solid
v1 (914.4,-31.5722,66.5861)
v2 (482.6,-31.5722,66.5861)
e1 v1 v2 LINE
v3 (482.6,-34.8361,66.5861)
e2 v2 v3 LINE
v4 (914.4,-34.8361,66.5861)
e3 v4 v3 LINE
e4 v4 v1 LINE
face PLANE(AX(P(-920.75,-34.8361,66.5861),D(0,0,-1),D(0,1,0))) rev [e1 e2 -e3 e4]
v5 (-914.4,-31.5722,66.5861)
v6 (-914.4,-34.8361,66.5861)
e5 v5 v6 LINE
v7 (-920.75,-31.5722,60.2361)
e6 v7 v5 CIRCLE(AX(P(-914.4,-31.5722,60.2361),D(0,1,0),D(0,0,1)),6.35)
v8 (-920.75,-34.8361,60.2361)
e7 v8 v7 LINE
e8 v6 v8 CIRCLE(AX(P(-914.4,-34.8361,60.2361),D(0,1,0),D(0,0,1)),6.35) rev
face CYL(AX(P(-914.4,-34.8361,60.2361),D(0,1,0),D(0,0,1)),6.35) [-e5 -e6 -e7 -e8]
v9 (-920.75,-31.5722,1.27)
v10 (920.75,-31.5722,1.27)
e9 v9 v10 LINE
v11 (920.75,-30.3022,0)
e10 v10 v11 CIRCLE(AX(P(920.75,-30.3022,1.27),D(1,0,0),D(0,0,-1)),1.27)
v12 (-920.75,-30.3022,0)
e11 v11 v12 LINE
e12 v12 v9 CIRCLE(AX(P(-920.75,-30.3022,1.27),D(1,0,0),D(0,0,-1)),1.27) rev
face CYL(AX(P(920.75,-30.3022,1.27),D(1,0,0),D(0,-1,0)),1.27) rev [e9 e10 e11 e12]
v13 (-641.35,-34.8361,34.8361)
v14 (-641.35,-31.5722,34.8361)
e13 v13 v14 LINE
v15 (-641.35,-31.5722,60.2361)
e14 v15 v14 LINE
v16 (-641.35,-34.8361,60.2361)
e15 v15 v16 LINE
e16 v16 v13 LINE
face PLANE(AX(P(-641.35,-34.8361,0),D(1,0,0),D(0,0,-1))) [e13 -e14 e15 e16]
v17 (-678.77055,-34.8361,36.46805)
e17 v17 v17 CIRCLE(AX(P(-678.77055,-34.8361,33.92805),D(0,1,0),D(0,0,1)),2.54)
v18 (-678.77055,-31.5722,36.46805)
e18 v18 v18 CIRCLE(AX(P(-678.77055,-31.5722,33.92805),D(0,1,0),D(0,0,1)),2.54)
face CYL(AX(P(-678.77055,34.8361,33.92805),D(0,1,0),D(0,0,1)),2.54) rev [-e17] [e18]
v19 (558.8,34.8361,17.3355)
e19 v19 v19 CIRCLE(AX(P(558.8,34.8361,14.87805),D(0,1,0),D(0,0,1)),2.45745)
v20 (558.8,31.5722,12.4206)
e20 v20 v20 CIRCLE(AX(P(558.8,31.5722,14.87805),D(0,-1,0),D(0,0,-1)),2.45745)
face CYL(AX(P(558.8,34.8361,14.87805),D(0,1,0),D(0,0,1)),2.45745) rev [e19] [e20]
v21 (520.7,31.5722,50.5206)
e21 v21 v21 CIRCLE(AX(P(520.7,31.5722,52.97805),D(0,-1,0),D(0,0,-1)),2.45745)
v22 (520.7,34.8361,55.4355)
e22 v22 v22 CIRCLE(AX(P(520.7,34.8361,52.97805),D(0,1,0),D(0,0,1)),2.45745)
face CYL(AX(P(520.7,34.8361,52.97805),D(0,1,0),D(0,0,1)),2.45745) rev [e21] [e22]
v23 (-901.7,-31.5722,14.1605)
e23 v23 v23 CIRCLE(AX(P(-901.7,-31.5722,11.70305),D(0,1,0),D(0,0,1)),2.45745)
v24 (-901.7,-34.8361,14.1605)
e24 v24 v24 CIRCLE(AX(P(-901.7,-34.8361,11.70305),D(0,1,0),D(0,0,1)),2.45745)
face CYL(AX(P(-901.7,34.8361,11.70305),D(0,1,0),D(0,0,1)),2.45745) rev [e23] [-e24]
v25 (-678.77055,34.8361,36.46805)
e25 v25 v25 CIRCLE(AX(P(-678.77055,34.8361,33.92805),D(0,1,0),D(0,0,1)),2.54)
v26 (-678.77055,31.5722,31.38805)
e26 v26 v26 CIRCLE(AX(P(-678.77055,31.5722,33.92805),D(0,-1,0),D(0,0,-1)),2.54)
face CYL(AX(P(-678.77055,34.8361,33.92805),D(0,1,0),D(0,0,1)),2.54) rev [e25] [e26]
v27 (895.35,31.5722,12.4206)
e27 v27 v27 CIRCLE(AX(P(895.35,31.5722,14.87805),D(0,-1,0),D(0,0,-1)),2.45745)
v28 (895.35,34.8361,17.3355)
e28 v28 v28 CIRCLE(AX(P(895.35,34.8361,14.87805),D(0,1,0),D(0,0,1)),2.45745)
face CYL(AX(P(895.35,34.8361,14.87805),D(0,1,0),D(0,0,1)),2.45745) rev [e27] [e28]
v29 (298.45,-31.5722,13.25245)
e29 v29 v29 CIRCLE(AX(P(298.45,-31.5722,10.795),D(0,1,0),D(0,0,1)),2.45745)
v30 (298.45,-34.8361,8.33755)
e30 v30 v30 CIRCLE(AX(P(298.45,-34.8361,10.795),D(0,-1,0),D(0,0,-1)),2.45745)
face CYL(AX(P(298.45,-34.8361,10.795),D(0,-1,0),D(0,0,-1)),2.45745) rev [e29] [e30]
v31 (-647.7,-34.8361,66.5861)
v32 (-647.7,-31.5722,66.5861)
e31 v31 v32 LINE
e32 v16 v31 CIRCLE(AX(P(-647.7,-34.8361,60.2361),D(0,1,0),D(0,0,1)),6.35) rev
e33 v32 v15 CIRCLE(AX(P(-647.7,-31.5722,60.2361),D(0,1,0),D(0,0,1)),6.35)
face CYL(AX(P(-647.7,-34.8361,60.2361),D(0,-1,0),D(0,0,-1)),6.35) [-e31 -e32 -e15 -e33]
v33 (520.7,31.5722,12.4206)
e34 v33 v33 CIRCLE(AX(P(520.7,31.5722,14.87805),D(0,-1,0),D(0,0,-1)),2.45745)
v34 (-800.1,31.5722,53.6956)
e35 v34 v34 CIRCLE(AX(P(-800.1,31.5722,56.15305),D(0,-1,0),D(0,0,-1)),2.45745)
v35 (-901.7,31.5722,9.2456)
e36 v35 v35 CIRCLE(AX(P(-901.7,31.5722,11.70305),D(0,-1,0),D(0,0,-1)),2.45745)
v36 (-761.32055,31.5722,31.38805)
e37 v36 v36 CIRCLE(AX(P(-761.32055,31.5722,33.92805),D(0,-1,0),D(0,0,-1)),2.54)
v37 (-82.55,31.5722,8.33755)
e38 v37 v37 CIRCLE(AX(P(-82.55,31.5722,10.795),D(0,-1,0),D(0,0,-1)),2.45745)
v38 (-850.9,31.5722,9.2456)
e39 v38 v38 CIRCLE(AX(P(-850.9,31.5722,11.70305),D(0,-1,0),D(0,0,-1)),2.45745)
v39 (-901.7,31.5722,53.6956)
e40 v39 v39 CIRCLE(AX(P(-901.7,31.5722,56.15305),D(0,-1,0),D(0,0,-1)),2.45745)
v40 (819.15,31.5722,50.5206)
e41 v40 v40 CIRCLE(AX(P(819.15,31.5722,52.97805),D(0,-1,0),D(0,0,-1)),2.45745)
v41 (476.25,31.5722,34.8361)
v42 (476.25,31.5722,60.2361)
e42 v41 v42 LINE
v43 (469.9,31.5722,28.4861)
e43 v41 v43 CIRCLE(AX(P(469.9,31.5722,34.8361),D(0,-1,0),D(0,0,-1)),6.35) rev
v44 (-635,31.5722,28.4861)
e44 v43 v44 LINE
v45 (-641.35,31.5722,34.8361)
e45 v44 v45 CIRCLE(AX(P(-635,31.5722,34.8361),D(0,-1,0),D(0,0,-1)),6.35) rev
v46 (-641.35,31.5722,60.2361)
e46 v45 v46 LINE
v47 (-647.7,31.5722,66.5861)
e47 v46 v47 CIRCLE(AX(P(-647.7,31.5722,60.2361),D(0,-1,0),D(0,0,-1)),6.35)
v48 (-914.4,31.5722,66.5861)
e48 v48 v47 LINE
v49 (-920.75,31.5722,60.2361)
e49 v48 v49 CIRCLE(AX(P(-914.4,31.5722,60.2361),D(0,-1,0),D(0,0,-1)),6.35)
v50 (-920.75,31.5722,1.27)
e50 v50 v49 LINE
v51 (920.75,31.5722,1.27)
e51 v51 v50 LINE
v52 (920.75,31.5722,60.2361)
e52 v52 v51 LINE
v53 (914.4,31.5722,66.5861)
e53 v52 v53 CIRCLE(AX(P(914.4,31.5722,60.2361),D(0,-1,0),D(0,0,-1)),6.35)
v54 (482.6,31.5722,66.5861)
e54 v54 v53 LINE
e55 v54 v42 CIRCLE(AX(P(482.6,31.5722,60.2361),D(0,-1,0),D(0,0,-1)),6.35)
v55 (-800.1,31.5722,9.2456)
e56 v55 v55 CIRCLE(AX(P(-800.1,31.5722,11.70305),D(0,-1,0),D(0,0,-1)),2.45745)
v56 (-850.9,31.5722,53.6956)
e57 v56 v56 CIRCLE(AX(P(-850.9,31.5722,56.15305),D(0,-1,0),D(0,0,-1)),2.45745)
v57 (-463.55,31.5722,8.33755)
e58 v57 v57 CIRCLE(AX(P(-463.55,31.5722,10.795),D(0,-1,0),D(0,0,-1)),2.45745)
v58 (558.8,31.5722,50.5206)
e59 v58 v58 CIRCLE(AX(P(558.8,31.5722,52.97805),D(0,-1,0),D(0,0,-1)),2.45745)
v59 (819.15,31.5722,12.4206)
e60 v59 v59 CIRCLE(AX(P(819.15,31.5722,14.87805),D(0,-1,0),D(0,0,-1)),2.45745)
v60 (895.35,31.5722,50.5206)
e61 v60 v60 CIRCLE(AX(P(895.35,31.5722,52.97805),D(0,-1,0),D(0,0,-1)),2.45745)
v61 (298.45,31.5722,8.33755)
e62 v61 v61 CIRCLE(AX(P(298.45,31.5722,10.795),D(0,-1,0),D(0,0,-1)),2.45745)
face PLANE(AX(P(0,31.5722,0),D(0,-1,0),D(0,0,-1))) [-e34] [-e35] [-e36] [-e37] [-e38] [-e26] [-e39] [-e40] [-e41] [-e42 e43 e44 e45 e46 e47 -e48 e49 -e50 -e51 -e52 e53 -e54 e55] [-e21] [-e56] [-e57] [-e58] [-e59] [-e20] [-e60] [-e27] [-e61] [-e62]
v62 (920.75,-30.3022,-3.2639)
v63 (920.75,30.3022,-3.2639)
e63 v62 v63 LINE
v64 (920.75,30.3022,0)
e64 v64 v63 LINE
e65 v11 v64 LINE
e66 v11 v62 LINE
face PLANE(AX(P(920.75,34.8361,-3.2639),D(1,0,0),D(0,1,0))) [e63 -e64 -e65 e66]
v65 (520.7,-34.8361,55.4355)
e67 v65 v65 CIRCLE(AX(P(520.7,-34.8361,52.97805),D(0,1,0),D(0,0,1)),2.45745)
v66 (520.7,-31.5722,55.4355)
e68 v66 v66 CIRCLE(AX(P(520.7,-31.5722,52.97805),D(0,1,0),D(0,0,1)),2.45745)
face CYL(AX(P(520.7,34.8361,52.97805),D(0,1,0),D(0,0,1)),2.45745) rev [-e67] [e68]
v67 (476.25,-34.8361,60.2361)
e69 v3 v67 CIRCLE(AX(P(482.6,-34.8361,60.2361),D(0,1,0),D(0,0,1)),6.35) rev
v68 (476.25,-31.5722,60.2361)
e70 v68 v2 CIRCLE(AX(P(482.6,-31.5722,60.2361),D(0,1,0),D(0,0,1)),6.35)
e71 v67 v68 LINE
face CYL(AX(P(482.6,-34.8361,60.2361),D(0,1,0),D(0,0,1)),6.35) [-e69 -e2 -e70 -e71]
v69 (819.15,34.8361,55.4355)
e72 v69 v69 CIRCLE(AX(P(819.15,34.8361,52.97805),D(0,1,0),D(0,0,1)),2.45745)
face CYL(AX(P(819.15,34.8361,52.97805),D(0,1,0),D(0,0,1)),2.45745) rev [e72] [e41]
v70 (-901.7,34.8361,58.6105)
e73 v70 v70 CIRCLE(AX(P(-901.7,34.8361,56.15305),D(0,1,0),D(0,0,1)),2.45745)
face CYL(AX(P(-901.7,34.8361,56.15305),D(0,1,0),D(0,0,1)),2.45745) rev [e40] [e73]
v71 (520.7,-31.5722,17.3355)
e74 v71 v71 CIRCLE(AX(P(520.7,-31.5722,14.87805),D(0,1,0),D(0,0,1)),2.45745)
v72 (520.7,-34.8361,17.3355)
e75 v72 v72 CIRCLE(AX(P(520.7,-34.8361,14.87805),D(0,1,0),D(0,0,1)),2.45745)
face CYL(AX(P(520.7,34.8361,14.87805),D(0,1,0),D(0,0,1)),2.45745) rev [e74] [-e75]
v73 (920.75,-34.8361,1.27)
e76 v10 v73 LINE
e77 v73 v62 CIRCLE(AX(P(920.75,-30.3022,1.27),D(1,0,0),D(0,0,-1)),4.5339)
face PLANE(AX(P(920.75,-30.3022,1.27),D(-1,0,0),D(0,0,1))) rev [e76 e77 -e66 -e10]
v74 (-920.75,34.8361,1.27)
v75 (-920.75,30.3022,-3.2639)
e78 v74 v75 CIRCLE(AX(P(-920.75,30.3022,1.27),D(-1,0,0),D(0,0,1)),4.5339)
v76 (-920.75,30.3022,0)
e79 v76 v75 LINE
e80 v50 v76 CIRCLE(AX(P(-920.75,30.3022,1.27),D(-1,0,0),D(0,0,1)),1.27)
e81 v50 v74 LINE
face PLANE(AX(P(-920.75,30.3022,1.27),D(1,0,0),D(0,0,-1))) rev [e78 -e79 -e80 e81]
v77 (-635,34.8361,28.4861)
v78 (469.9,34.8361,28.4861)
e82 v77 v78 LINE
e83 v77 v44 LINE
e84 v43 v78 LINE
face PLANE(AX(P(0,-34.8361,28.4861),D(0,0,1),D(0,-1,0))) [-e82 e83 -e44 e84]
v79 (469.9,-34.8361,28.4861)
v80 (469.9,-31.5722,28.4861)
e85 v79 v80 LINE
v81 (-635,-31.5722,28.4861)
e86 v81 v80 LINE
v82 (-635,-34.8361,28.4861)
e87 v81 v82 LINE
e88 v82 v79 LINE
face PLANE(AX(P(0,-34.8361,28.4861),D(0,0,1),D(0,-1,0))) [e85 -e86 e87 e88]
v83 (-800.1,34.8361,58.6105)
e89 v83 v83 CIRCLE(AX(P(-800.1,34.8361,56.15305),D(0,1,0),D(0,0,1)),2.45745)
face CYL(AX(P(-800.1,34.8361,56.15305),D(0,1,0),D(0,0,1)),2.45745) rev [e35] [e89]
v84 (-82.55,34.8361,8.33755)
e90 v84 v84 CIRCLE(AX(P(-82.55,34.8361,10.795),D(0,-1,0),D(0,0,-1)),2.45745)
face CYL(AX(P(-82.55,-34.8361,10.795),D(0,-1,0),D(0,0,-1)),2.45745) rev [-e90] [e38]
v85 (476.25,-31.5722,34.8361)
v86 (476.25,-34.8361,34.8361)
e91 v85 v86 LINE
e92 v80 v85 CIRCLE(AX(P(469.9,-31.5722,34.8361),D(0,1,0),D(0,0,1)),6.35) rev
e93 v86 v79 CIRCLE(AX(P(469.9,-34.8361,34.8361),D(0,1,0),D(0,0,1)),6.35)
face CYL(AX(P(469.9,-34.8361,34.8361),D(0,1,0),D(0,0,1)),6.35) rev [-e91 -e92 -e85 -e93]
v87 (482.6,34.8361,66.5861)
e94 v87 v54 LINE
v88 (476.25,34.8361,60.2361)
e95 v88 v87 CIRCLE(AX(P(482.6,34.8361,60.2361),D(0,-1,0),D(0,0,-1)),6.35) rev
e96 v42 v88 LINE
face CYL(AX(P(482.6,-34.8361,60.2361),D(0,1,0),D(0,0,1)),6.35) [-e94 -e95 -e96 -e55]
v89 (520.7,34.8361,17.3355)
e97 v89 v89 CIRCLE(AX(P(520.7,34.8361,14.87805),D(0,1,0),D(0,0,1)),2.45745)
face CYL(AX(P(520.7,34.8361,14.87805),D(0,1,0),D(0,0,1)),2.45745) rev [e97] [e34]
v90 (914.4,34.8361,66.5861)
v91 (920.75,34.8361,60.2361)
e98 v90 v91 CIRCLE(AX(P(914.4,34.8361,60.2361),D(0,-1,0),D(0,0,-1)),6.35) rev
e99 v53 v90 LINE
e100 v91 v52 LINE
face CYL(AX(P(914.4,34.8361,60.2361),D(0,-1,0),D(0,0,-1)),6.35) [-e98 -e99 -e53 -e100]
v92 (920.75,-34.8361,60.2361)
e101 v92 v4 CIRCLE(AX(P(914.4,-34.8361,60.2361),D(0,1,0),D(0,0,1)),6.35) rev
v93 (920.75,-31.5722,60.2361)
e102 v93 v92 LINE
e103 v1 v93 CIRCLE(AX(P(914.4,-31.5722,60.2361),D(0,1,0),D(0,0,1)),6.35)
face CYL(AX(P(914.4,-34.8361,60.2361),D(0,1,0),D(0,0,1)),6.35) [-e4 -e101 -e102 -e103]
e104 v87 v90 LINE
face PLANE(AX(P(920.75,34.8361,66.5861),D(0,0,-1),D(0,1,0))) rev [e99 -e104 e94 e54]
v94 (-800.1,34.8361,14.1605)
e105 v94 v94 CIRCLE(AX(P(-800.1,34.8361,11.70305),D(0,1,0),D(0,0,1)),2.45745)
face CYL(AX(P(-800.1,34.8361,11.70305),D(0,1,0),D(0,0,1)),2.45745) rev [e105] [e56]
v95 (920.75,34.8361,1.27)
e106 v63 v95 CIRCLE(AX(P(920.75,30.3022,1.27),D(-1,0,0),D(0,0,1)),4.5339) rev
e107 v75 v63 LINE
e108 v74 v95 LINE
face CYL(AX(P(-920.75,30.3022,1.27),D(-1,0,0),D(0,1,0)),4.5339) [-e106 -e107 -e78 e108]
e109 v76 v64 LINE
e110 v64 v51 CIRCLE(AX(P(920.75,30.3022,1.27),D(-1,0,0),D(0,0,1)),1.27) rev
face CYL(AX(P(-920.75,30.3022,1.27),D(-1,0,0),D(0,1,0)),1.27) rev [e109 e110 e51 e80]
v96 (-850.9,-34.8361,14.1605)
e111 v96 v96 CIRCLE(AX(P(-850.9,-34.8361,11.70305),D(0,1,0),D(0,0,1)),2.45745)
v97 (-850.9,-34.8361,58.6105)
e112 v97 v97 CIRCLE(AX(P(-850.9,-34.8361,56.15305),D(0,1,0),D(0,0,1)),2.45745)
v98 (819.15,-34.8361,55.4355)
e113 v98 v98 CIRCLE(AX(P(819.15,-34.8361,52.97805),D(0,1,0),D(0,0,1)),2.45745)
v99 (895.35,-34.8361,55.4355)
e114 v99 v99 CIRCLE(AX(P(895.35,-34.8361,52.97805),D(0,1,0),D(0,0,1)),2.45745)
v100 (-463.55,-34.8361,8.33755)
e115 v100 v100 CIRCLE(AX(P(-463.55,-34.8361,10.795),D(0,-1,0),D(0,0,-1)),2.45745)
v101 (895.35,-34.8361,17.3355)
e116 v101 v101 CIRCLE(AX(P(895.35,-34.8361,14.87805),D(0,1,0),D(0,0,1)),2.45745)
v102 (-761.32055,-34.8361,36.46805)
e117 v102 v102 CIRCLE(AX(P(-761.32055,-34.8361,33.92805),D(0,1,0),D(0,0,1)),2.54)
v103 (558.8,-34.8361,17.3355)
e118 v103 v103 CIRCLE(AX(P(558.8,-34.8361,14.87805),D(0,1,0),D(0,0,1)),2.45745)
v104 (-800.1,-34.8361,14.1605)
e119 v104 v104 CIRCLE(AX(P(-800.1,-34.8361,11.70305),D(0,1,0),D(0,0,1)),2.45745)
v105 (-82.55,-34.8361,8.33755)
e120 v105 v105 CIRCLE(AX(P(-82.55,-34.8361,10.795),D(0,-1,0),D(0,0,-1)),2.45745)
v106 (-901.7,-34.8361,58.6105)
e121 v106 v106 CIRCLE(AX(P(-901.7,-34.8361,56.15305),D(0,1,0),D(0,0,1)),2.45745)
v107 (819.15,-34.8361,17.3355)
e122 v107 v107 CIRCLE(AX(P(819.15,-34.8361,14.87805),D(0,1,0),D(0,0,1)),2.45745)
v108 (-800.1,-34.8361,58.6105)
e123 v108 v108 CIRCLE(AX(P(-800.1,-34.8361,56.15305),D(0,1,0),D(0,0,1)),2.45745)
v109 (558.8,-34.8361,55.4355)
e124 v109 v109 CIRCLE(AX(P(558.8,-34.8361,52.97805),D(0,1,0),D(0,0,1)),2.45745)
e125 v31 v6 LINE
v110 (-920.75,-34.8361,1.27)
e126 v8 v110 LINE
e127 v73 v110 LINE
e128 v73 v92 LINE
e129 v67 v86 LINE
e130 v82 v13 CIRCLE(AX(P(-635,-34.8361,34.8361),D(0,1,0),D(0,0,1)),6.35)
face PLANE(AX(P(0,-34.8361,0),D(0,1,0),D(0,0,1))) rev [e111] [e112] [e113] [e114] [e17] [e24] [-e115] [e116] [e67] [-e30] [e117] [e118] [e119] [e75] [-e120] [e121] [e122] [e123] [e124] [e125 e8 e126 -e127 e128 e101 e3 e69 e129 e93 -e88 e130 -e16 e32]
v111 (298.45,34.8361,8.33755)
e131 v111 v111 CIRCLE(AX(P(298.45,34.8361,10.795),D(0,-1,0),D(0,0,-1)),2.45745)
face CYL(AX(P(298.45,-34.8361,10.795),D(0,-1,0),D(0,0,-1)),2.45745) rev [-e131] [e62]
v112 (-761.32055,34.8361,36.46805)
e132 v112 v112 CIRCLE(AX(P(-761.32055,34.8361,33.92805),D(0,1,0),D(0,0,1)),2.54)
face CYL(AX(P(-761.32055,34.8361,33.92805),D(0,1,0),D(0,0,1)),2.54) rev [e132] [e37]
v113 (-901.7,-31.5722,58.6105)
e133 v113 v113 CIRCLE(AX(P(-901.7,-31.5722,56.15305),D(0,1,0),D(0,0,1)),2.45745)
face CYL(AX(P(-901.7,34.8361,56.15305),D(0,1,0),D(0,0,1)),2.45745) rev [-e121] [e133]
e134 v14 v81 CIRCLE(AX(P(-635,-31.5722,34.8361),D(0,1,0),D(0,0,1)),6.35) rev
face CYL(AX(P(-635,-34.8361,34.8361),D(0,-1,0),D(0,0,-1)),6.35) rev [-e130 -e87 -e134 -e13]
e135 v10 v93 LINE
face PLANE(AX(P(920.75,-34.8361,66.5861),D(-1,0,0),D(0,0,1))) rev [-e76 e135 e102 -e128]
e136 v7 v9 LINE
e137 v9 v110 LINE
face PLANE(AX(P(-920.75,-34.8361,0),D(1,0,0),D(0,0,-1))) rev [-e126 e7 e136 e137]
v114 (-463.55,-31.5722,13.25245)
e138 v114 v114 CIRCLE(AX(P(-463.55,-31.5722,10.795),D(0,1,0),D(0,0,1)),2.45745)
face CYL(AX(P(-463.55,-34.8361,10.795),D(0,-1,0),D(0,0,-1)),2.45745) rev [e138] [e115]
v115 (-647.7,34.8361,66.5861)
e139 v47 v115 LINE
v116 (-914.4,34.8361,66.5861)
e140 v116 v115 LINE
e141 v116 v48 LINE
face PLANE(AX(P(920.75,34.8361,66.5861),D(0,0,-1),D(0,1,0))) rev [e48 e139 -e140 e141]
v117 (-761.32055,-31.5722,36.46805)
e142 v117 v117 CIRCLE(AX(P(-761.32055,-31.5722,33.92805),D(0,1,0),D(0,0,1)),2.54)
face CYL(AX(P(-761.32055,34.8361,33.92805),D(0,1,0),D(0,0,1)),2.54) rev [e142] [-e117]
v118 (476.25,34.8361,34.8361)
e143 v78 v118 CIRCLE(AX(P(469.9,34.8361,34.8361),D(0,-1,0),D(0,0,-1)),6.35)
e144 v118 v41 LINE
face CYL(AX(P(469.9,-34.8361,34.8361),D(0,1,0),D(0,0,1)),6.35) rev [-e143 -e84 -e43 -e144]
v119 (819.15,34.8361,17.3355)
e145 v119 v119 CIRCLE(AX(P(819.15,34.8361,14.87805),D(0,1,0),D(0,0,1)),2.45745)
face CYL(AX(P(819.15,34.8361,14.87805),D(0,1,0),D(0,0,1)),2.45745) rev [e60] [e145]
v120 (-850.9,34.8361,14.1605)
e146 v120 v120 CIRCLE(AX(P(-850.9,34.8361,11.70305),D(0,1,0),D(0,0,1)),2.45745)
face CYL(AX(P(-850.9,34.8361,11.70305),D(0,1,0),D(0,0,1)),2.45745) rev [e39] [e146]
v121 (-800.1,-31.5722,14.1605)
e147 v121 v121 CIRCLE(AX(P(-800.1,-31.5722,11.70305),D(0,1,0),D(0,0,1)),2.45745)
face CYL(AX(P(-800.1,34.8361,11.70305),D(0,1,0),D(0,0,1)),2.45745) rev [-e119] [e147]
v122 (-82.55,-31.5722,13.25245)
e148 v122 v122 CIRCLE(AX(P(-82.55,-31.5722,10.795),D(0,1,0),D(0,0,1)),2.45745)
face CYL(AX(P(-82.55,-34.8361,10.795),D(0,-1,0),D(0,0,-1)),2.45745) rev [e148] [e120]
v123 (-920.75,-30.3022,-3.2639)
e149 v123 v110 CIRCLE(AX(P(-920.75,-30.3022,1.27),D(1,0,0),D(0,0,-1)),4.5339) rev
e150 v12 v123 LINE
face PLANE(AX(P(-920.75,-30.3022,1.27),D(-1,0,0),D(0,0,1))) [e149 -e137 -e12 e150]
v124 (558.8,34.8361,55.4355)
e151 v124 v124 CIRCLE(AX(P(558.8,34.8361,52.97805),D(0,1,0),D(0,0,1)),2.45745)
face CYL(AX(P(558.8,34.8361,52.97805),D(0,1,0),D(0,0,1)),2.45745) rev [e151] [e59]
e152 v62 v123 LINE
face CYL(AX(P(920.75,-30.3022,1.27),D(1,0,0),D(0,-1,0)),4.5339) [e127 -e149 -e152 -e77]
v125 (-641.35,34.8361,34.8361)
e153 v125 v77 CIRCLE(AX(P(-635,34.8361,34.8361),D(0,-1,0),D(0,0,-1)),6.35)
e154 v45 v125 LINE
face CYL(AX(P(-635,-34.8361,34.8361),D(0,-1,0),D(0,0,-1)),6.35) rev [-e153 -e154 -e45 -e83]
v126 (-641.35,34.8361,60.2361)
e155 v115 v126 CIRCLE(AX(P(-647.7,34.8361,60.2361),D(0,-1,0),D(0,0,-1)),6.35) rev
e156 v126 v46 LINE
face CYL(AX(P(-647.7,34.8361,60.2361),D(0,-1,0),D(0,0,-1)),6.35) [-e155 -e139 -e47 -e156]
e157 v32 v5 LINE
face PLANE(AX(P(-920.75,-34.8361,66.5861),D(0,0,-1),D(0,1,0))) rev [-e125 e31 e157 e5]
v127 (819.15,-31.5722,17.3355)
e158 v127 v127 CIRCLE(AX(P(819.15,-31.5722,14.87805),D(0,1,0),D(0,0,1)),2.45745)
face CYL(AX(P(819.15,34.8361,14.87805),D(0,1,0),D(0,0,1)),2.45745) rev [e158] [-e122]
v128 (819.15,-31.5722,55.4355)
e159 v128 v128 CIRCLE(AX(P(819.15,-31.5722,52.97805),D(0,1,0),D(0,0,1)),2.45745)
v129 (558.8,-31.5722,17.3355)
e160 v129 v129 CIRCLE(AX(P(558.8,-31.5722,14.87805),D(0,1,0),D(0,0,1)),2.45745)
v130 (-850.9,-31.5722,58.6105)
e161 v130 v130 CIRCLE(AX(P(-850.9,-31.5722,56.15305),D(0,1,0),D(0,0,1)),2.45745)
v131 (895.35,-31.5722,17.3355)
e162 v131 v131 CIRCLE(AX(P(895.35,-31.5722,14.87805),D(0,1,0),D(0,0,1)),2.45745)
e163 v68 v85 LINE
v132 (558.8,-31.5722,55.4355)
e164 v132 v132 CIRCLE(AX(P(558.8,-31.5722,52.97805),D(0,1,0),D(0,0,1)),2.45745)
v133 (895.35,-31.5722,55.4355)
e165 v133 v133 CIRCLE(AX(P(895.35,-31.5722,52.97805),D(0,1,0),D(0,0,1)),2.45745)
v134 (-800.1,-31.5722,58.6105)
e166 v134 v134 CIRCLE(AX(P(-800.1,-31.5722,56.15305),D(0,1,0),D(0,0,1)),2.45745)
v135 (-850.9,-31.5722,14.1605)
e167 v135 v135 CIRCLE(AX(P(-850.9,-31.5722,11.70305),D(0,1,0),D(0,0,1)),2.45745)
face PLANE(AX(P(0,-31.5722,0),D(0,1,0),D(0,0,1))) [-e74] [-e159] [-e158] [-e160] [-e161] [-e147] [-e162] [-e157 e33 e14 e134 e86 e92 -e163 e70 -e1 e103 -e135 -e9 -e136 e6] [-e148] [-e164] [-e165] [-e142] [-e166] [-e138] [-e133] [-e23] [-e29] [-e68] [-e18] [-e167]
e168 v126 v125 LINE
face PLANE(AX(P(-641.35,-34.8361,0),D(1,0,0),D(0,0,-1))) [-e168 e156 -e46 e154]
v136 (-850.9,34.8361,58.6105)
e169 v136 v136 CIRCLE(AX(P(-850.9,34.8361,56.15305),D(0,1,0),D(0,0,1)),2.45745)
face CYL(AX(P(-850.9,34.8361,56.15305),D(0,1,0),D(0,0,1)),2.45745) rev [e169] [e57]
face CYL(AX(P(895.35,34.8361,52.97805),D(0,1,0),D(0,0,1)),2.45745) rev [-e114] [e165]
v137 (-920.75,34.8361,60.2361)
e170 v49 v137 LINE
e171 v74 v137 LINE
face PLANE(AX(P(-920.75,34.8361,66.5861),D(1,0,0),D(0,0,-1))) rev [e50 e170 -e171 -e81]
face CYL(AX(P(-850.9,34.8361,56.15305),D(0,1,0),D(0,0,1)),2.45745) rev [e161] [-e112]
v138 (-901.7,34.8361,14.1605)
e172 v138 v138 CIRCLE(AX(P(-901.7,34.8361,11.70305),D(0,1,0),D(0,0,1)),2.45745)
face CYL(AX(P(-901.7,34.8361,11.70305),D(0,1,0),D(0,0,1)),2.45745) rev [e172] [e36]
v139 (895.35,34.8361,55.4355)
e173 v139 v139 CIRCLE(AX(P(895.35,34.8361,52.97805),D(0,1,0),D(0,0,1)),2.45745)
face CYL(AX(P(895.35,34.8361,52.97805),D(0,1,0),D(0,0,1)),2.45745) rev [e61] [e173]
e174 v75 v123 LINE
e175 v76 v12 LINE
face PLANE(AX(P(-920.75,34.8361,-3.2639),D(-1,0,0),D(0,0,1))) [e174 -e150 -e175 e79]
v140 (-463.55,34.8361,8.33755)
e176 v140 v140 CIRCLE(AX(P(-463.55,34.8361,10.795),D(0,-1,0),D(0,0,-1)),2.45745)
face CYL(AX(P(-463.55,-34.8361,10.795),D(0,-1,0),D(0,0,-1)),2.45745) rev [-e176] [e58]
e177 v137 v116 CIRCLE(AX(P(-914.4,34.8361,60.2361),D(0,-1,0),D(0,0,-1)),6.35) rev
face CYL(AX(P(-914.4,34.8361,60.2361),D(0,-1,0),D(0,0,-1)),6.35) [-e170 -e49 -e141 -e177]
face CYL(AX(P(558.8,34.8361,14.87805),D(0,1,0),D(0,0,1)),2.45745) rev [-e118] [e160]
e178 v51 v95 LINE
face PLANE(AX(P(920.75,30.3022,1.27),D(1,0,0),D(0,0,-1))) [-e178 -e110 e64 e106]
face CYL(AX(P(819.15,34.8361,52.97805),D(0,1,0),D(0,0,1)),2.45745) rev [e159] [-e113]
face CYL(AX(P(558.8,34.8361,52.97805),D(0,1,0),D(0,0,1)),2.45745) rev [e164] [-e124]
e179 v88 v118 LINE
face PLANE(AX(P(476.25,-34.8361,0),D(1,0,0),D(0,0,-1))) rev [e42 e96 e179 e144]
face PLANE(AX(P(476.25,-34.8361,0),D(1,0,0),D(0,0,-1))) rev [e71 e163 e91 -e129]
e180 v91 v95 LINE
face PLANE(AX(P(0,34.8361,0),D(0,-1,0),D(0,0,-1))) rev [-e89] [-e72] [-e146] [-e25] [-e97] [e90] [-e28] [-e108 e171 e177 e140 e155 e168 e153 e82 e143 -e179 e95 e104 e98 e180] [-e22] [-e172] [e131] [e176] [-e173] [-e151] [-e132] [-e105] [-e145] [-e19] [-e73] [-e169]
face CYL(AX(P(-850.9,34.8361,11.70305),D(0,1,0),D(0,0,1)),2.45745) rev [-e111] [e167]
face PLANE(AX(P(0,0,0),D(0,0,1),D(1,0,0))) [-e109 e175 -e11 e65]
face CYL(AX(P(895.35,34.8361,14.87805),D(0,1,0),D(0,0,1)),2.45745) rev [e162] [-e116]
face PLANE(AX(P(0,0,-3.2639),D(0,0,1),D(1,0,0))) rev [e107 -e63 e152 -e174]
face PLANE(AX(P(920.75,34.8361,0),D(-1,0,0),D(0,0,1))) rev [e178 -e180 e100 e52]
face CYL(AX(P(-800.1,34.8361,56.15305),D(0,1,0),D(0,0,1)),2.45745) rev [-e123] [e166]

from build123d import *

# Parameters (mm, degrees)
SKETCH2_W                      = 1841.5
SKETCH2_H                      = 69.6722
BASE_FLANGE1_DEPTH             = 3.2639
EDGE_FLANGE1_STRIP_W           = 15.5956
EDGE_FLANGE1_STRIP_H           = 3.2639
EDGE_FLANGE1_STRIP_CUT_DEPTH   = 1841.5
EDGE_FLANGE1_STRIP_2_W         = 15.5956
EDGE_FLANGE1_STRIP_2_H         = 3.2639
EDGE_FLANGE1_STRIP_CUT_2_DEPTH = 1841.5
EDGE_FLANGE1_DEPTH             = 1841.5
EDGE_FLANGE1_BEND_DEPTH        = 1841.5
F_10_0_1935_DIAMETER_HOLE1_D   = 4.9149
F_10_0_1935_DIAMETER_HOLE3_D   = 4.9149
F_10_0_1935_DIAMETER_HOLE4_D   = 4.9149
F_10_0_2_DIAMETER_HOLE1_D      = 5.08
F_10_0_1935_DIAMETER_HOLE6_D   = 4.9149
LPATTERN2_COUNT                = 3
LPATTERN2_PITCH                = 381
CUT_EXTRUDE1_DEPTH             = 926.779934253
FILLET2_R                      = 6.35


# Sheet-metal steps are written as plain solids
with BuildPart() as part:
    # Sketch2 → Base-Flange1 (new body)
    with BuildSketch(Plane.XY):
        Rectangle(SKETCH2_W, SKETCH2_H)
    extrude(amount=-BASE_FLANGE1_DEPTH)

    # Edge-Flange1 strip (across the edge) → Edge-Flange1 strip cut (cut)
    with BuildSketch(Plane(origin=(920.75, 34.8361, 0), x_dir=(0, -1, 0), z_dir=(-1, 0, 0))):
        with Locations((-3.2639, -1.63195)):
            Rectangle(EDGE_FLANGE1_STRIP_W, EDGE_FLANGE1_STRIP_H)
    extrude(amount=EDGE_FLANGE1_STRIP_CUT_DEPTH, mode=Mode.SUBTRACT)

    # Edge-Flange1 strip 2 (across the edge) → Edge-Flange1 strip cut 2 (cut)
    with BuildSketch(Plane(origin=(-920.75, -34.8361, 0), x_dir=(0, 1, 0), z_dir=(1, 0, 0))):
        with Locations((-3.2639, -1.63195)):
            Rectangle(EDGE_FLANGE1_STRIP_2_W, EDGE_FLANGE1_STRIP_2_H)
    extrude(amount=EDGE_FLANGE1_STRIP_CUT_2_DEPTH, mode=Mode.SUBTRACT)

    # Edge-Flange1 section (across the edge) → Edge-Flange1 (add)
    with BuildSketch(Plane(origin=(920.75, 34.8361, 0), x_dir=(0, -1, 0), z_dir=(-1, 0, 0))):
        with BuildLine():
            Line((0, 1.27), (0, 66.5861))
            Line((0, 66.5861), (3.2639, 66.5861))
            Line((3.2639, 66.5861), (3.2639, 1.27))
            ThreePointArc((3.2639, 1.27), (3.635874388, 0.371974388), (4.5339, 0))
            Line((4.5339, 0), (4.5339, -3.2639))
            ThreePointArc((4.5339, -3.2639), (1.327948565, -1.935951435), (0, 1.27))
        make_face()
    extrude(amount=EDGE_FLANGE1_DEPTH)

    # Edge-Flange1 section 2 (across the edge) → Edge-Flange1 bend (add)
    with BuildSketch(Plane(origin=(-920.75, -34.8361, 0), x_dir=(0, 1, 0), z_dir=(1, 0, 0))):
        with BuildLine():
            Line((0, 1.27), (0, 66.5861))
            Line((0, 66.5861), (3.2639, 66.5861))
            Line((3.2639, 66.5861), (3.2639, 1.27))
            ThreePointArc((3.2639, 1.27), (3.635874388, 0.371974388), (4.5339, 0))
            Line((4.5339, 0), (4.5339, -3.2639))
            ThreePointArc((4.5339, -3.2639), (1.327948565, -1.935951435), (0, 1.27))
        make_face()
    extrude(amount=EDGE_FLANGE1_BEND_DEPTH)

    # #10 (0.1935) Diameter Hole1 (through all)
    with Locations(Plane(origin=(0, 34.8361, 34.8361), x_dir=(-1, 0, 0), z_dir=(0, 1, 0))):
        with Locations((800.1, -23.13305), (800.1, 21.31695), (850.9, 21.31695), (850.9, -23.13305), (901.7, 21.31695), (901.7, -23.13305)):
            Hole(F_10_0_1935_DIAMETER_HOLE1_D / 2)

    # #10 (0.1935) Diameter Hole3 (through all)
    with Locations(Plane(origin=(0, 34.8361, 0), x_dir=(1, 0, 0), z_dir=(0, 1, 0))):
        with Locations((819.15, -14.87805), (819.15, -52.97805), (895.35, -14.87805), (895.35, -52.97805)):
            Hole(F_10_0_1935_DIAMETER_HOLE3_D / 2)

    # #10 (0.1935) Diameter Hole4 (through all)
    with Locations(Plane(origin=(0, 34.8361, 0), x_dir=(1, 0, 0), z_dir=(0, 1, 0))):
        with Locations((520.7, -14.87805), (558.8, -14.87805), (558.8, -52.97805), (520.7, -52.97805)):
            Hole(F_10_0_1935_DIAMETER_HOLE4_D / 2)

    # #10 (0.2) Diameter Hole1 (through all)
    with Locations(Plane(origin=(0, 34.8361, 0), x_dir=(1, 0, 0), z_dir=(0, 1, 0))):
        with Locations((-761.32055, -33.92805), (-678.77055, -33.92805)):
            Hole(F_10_0_2_DIAMETER_HOLE1_D / 2)

    # #10 (0.1935) Diameter Hole6 (through all)
    with Locations(Plane(origin=(0, -34.8361, 0), x_dir=(-1, 0, 0), z_dir=(0, -1, 0))):
        with Locations((463.55, -10.795)):
            f_10_0_1935_diameter_hole6 = Hole(F_10_0_1935_DIAMETER_HOLE6_D / 2)

    # LPattern2: #10 (0.1935) Diameter Hole6 ×3
    with Locations(*[(i * LPATTERN2_PITCH, 0, 0) for i in range(1, LPATTERN2_COUNT)]):
        add(f_10_0_1935_diameter_hole6, mode=Mode.SUBTRACT)

    # Sketch46 → Cut-Extrude1 (cut, through all)
    with BuildSketch(Plane(origin=(0, 34.8361, 0), x_dir=(1, 0, 0), z_dir=(0, 1, 0))):
        Polygon((-641.35, -28.4861), (-641.35, -66.5861), (476.25, -66.5861), (476.25, -28.4861), (-82.55, -28.4861), align=None)
    extrude(amount=-CUT_EXTRUDE1_DEPTH, mode=Mode.SUBTRACT)

    # Fillet2
    fillet2_edges = [part.edges().sort_by_distance(p)[0] for p in [
        (476.25, 33.20415, 66.5861),
        (-641.35, 33.20415, 28.4861),
        (-641.35, 33.20415, 66.5861),
        (476.25, 33.20415, 28.4861),
        (476.25, -33.20415, 66.5861),
        (-641.35, -33.20415, 66.5861),
        (-641.35, -33.20415, 28.4861),
        (476.25, -33.20415, 28.4861),
        (920.75, 33.20415, 66.5861),
        (-920.75, 33.20415, 66.5861),
        (-920.75, -33.20415, 66.5861),
        (920.75, -33.20415, 66.5861),
    ]]
    fillet(fillet2_edges, radius=FILLET2_R)


solid = part.part
